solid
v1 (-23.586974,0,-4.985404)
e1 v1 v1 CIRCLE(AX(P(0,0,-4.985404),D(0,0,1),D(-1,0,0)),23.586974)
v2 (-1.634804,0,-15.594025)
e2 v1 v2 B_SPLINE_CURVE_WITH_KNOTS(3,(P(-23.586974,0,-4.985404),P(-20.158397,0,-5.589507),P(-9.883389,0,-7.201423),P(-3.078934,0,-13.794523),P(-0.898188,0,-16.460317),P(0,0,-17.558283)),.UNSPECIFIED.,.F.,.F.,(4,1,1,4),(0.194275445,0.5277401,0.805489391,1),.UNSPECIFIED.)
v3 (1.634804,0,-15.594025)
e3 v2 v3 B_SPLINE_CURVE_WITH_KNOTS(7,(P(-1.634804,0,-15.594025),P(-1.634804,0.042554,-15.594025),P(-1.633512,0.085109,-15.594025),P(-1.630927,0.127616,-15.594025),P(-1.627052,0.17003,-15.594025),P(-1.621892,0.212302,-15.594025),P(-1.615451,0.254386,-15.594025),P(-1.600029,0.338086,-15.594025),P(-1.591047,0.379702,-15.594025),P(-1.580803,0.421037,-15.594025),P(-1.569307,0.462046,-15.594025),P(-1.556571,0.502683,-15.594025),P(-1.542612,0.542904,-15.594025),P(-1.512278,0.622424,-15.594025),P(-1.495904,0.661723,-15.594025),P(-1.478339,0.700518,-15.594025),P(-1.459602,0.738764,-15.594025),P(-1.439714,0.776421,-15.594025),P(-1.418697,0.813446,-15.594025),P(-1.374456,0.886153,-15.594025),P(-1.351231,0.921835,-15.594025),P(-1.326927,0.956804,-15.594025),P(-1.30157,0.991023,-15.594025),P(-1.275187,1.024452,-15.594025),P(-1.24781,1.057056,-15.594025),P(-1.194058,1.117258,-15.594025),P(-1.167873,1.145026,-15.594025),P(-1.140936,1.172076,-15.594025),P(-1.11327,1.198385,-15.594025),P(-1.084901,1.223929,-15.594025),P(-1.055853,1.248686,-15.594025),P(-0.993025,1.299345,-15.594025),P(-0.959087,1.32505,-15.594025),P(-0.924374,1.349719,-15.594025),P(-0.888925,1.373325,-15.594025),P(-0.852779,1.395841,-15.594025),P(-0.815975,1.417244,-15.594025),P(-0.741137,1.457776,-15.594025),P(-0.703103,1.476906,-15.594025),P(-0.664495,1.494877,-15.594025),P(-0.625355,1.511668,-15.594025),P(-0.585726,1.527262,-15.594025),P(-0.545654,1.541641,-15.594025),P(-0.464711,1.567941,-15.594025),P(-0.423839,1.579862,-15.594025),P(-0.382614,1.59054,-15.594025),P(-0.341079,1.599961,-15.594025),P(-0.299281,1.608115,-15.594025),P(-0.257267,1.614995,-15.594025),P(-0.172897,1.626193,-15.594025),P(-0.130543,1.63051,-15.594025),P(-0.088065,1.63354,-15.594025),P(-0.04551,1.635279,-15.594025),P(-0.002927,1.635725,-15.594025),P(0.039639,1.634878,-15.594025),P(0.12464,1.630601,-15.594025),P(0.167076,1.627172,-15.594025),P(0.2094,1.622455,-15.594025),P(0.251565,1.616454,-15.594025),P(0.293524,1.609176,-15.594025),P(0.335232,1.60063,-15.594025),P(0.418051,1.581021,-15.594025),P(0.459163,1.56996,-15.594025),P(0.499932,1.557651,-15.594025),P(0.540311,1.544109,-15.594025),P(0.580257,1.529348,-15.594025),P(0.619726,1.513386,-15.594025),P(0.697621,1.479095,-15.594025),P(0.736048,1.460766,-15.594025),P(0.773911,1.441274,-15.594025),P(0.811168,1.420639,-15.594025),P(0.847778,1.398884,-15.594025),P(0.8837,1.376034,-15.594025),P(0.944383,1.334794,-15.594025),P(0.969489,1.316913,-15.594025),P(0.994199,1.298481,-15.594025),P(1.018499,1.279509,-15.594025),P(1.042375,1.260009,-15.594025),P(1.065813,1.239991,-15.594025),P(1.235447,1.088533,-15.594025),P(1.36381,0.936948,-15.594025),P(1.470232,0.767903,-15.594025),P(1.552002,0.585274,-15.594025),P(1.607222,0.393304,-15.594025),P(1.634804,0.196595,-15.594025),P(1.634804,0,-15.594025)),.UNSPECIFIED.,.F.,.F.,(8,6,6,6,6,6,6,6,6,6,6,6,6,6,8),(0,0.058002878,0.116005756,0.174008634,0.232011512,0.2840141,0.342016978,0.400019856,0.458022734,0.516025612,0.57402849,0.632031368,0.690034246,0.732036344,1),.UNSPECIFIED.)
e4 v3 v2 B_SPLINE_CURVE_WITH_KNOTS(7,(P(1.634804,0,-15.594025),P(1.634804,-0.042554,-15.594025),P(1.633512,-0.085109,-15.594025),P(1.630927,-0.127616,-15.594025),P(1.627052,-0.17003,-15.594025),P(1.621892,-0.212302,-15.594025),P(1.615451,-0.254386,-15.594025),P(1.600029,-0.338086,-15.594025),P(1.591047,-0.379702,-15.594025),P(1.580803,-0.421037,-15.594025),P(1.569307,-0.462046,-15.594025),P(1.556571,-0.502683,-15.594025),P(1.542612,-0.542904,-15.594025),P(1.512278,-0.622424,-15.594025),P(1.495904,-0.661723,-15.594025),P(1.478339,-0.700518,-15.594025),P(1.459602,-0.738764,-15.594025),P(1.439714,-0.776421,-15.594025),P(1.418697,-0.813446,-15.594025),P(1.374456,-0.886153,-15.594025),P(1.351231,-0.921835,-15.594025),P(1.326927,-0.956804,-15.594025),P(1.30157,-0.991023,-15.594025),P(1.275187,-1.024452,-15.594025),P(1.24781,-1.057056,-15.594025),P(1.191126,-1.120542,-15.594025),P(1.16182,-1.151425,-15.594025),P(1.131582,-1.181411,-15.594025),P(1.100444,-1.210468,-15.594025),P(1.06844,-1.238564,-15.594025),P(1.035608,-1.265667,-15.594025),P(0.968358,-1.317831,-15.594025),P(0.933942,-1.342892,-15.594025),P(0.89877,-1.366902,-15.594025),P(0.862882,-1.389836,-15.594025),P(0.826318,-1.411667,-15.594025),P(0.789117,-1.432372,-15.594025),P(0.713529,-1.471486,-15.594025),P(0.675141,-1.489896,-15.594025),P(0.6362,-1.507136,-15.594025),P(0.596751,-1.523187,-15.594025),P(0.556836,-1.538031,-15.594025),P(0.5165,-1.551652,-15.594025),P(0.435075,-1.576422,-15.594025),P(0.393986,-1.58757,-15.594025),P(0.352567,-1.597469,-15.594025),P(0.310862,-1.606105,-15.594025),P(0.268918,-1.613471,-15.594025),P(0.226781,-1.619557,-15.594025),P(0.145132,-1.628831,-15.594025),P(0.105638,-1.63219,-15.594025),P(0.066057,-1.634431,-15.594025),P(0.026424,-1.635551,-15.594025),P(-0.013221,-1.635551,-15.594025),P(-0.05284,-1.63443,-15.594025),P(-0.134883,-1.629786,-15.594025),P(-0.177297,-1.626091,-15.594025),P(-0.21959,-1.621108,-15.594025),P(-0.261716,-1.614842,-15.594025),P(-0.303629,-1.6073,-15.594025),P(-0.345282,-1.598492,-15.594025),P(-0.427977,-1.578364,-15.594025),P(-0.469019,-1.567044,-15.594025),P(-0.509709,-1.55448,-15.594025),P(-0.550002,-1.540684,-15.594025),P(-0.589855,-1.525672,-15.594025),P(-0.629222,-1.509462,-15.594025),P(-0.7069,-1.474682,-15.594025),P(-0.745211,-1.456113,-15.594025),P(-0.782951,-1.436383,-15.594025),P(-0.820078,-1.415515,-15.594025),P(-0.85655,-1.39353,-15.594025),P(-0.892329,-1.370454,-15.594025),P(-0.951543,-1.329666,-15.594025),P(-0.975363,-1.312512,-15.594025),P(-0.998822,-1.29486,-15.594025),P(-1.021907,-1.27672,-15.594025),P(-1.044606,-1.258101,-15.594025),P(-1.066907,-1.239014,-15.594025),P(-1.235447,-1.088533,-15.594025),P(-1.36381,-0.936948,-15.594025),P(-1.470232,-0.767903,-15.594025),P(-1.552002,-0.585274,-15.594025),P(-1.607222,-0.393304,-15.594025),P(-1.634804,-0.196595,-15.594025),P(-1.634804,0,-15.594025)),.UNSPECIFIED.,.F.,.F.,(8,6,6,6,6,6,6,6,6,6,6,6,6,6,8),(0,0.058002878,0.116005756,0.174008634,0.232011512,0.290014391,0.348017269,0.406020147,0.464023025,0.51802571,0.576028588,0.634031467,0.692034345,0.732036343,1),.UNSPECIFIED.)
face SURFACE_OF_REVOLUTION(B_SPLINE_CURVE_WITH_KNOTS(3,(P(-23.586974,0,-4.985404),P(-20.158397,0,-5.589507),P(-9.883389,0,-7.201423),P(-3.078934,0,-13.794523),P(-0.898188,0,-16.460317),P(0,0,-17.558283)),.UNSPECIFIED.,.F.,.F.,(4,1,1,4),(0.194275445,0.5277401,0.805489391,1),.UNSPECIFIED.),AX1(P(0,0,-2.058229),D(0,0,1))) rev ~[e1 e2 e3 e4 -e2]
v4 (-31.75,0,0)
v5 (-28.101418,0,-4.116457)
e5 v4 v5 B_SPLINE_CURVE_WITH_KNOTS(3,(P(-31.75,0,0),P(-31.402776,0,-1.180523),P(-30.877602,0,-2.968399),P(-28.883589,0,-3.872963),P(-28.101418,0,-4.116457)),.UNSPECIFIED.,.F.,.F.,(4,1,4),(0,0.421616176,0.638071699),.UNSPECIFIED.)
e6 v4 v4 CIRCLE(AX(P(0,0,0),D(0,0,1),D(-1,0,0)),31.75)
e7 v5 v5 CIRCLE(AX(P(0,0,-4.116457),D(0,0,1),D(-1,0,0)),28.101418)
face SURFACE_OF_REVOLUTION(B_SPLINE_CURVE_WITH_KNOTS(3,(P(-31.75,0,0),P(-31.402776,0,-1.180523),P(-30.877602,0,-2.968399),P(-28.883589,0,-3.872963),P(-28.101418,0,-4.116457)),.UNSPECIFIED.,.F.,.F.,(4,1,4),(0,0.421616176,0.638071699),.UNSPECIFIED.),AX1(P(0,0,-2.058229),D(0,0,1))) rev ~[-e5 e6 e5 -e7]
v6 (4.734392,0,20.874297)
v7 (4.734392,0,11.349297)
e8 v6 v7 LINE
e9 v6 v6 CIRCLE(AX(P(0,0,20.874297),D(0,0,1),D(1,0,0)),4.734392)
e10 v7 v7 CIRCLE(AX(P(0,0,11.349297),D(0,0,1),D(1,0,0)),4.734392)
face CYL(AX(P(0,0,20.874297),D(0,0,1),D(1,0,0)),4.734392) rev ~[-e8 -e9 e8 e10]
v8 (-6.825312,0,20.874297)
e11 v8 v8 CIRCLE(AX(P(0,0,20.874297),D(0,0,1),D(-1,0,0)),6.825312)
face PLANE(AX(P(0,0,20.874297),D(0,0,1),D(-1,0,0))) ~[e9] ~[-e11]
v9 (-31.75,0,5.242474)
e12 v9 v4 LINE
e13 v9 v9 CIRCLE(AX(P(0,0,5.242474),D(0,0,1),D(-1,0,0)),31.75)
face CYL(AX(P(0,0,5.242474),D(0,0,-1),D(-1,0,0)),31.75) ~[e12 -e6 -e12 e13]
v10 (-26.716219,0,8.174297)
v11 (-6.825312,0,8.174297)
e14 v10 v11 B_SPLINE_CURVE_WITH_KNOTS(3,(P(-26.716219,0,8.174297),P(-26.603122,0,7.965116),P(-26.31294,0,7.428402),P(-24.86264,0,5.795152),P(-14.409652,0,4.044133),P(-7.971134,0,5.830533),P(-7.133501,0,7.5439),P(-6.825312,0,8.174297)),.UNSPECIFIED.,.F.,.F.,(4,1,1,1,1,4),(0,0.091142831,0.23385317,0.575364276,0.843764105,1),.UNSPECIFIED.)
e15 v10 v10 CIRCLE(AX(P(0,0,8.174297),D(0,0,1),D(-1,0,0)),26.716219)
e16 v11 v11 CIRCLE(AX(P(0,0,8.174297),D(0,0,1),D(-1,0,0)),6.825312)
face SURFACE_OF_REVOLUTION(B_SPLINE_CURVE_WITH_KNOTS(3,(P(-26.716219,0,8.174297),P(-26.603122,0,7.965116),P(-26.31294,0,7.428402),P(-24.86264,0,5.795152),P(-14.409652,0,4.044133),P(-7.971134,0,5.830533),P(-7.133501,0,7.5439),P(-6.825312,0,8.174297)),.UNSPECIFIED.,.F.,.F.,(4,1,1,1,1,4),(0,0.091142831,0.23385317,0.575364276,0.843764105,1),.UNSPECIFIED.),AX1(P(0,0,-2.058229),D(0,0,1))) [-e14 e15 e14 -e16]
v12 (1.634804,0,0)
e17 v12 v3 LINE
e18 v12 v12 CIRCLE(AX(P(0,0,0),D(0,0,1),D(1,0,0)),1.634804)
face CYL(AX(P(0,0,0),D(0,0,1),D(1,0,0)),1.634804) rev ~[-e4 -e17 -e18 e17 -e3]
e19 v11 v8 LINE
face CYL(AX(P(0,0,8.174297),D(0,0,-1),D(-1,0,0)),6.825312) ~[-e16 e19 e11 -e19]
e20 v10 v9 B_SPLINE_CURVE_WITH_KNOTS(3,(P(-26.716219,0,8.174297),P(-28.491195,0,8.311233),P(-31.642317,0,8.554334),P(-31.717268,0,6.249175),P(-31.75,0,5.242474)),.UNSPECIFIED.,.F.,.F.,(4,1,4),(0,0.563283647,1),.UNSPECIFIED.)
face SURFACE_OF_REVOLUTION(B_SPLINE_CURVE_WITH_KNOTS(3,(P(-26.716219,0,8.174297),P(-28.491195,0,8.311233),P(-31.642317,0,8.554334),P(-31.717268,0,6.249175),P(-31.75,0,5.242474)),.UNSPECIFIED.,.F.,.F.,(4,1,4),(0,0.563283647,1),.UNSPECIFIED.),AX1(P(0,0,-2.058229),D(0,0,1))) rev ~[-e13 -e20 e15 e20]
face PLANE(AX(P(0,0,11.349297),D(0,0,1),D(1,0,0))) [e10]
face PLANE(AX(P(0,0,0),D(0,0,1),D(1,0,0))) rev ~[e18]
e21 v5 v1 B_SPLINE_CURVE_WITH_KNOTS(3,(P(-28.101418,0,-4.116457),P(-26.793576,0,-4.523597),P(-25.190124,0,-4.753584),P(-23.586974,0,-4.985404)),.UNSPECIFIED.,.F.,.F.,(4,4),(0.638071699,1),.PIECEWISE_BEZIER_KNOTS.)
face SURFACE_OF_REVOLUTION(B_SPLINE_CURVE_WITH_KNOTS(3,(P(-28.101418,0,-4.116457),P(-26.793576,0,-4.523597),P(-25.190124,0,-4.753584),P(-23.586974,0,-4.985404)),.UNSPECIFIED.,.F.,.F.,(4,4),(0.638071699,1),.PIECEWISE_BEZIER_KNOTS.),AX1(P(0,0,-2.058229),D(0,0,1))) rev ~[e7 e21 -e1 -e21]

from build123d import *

# Parameters (mm, degrees)
F2_DEPTH = 12.7
F3_R     = 1.6348042273
F4_DEPTH = 19.6596
F5_R     = 4.7343922938
F6_DEPTH = 9.525


# Not quite as in the source:
# - a feature names something its author has since deleted; it is built from what else it names


with BuildPart() as f1:
    # F0 (on Front) → F1 (revolve)
    with BuildSketch(Plane.XZ):
        Polygon((0, 4.4785123318), (0, 8.1742972476), (-4.7625, 8.1742972476), (-6.8253115751, 8.1742972476), (-6.8253115751, 4.4785123318), align=None)
        with BuildLine():
            Line((0, 0), (0, 4.4785123318))
            Line((0, 4.4785123318), (-6.8253115751, 4.4785123318))
            Line((-6.8253115751, 4.4785123318), (-26.7162192613, 4.4785123318))
            Line((-26.7162192613, 4.4785123318), (-26.7162192613, 8.1742972476))
            add(Edge.make_bspline(
                [(-26.7162192613, 8.1742972476), (-28.491194666, 8.3112325103), (-31.642316511, 8.5543343001), (-31.7172676235, 6.2491747733), (-31.75, 5.2424739115)],
                knots=[0, 0, 0, 0, 0.5632836469, 1, 1, 1, 1], degree=3))
            Line((-31.75, 5.2424739115), (-31.75, 0))
            Line((-31.75, 0), (0, 0))
        make_face()
        with BuildLine():
            Line((0, -4.1164574213), (0, 0))
            Line((0, 0), (-31.75, 0))
            add(Edge.make_bspline(
                [(-31.75, 0), (-31.4027760977, -1.1805231122), (-30.8776022636, -2.9683987357), (-28.8835885285, -3.872962504), (-28.1014181098, -4.1164574213)],
                knots=[0, 0, 0, 0, 0.4216161755, 0.638071699, 0.638071699, 0.638071699, 0.638071699], degree=3))
            Line((-28.1014181098, -4.1164574213), (0, -4.1164574213))
        make_face()
        with BuildLine():
            Line((-26.7162192613, 4.4785123318), (-6.8253115751, 4.4785123318))
            Line((-6.8253115751, 4.4785123318), (-6.8253115751, 8.1742972476))
            add(Edge.make_bspline(
                [(-26.7162192613, 8.1742972476), (-26.6031223158, 7.9651163147), (-26.3129395448, 7.4284024145), (-24.8626402231, 5.7951518451), (-14.4096521607, 4.0441326554), (-7.9711337562, 5.8305330049), (-7.1335011103, 7.5438995955), (-6.8253115751, 8.1742972476)],
                knots=[0, 0, 0, 0, 0.0911428309, 0.23385317, 0.5753642763, 0.8437641047, 1, 1, 1, 1], degree=3))
            Line((-26.7162192613, 8.1742972476), (-26.7162192613, 4.4785123318))
        make_face()
        with BuildLine():
            Line((0, -17.5582827176), (0, -4.1164574213))
            Line((0, -4.1164574213), (-28.1014181098, -4.1164574213))
            add(Edge.make_bspline(
                [(-28.1014181098, -4.1164574213), (-26.8429354447, -4.3749563957), (-25.5844527797, -4.6334553702), (-23.5869744443, -4.9854039485)],
                knots=[0, 0, 0, 0, 0.1942754447, 0.1942754447, 0.1942754447, 0.1942754447], degree=3))
            add(Edge.make_bspline(
                [(-23.5869744443, -4.9854039485), (-20.1583969161, -5.5895071147), (-9.8833890293, -7.2014232525), (-3.0789336633, -13.7945227485), (-0.8981879892, -16.4603168735), (0, -17.5582827176)],
                knots=[0.1942754447, 0.1942754447, 0.1942754447, 0.1942754447, 0.5277400996, 0.8054893905, 1, 1, 1, 1], degree=3))
        make_face()
        with BuildLine():
            add(Edge.make_bspline(
                [(-28.1014181098, -4.1164574213), (-26.8429354447, -4.3749563957), (-25.5844527797, -4.6334553702), (-23.5869744443, -4.9854039485)],
                knots=[0, 0, 0, 0, 0.1942754447, 0.1942754447, 0.1942754447, 0.1942754447], degree=3))
            add(Edge.make_bspline(
                [(-28.1014181098, -4.1164574213), (-26.7935761747, -4.5235974207), (-25.1901235467, -4.7535844093), (-23.5869744443, -4.9854039485)],
                knots=[0.638071699, 0.638071699, 0.638071699, 0.638071699, 1, 1, 1, 1], degree=3))
        make_face()
    revolve(axis=Axis((0, 0, -2.0582287107), (0, 0, 1)))

    # F2 (add): a face of the model
    f2_faces = [f1.faces().sort_by_distance(p)[0] for p in [
        (0, 0, 8.1742972476),
    ]]
    extrude(f2_faces, amount=F2_DEPTH)

    # F3 (on Top) → F4 (cut)
    with BuildSketch(Plane.XY):
        Circle(F3_R)
    extrude(amount=-F4_DEPTH, mode=Mode.SUBTRACT)

    # F5 (on face) → F6 (cut)
    with BuildSketch(Plane.XY.offset(20.8742972476)):
        Circle(F5_R)
    extrude(amount=-F6_DEPTH, mode=Mode.SUBTRACT)


solid = f1.part
